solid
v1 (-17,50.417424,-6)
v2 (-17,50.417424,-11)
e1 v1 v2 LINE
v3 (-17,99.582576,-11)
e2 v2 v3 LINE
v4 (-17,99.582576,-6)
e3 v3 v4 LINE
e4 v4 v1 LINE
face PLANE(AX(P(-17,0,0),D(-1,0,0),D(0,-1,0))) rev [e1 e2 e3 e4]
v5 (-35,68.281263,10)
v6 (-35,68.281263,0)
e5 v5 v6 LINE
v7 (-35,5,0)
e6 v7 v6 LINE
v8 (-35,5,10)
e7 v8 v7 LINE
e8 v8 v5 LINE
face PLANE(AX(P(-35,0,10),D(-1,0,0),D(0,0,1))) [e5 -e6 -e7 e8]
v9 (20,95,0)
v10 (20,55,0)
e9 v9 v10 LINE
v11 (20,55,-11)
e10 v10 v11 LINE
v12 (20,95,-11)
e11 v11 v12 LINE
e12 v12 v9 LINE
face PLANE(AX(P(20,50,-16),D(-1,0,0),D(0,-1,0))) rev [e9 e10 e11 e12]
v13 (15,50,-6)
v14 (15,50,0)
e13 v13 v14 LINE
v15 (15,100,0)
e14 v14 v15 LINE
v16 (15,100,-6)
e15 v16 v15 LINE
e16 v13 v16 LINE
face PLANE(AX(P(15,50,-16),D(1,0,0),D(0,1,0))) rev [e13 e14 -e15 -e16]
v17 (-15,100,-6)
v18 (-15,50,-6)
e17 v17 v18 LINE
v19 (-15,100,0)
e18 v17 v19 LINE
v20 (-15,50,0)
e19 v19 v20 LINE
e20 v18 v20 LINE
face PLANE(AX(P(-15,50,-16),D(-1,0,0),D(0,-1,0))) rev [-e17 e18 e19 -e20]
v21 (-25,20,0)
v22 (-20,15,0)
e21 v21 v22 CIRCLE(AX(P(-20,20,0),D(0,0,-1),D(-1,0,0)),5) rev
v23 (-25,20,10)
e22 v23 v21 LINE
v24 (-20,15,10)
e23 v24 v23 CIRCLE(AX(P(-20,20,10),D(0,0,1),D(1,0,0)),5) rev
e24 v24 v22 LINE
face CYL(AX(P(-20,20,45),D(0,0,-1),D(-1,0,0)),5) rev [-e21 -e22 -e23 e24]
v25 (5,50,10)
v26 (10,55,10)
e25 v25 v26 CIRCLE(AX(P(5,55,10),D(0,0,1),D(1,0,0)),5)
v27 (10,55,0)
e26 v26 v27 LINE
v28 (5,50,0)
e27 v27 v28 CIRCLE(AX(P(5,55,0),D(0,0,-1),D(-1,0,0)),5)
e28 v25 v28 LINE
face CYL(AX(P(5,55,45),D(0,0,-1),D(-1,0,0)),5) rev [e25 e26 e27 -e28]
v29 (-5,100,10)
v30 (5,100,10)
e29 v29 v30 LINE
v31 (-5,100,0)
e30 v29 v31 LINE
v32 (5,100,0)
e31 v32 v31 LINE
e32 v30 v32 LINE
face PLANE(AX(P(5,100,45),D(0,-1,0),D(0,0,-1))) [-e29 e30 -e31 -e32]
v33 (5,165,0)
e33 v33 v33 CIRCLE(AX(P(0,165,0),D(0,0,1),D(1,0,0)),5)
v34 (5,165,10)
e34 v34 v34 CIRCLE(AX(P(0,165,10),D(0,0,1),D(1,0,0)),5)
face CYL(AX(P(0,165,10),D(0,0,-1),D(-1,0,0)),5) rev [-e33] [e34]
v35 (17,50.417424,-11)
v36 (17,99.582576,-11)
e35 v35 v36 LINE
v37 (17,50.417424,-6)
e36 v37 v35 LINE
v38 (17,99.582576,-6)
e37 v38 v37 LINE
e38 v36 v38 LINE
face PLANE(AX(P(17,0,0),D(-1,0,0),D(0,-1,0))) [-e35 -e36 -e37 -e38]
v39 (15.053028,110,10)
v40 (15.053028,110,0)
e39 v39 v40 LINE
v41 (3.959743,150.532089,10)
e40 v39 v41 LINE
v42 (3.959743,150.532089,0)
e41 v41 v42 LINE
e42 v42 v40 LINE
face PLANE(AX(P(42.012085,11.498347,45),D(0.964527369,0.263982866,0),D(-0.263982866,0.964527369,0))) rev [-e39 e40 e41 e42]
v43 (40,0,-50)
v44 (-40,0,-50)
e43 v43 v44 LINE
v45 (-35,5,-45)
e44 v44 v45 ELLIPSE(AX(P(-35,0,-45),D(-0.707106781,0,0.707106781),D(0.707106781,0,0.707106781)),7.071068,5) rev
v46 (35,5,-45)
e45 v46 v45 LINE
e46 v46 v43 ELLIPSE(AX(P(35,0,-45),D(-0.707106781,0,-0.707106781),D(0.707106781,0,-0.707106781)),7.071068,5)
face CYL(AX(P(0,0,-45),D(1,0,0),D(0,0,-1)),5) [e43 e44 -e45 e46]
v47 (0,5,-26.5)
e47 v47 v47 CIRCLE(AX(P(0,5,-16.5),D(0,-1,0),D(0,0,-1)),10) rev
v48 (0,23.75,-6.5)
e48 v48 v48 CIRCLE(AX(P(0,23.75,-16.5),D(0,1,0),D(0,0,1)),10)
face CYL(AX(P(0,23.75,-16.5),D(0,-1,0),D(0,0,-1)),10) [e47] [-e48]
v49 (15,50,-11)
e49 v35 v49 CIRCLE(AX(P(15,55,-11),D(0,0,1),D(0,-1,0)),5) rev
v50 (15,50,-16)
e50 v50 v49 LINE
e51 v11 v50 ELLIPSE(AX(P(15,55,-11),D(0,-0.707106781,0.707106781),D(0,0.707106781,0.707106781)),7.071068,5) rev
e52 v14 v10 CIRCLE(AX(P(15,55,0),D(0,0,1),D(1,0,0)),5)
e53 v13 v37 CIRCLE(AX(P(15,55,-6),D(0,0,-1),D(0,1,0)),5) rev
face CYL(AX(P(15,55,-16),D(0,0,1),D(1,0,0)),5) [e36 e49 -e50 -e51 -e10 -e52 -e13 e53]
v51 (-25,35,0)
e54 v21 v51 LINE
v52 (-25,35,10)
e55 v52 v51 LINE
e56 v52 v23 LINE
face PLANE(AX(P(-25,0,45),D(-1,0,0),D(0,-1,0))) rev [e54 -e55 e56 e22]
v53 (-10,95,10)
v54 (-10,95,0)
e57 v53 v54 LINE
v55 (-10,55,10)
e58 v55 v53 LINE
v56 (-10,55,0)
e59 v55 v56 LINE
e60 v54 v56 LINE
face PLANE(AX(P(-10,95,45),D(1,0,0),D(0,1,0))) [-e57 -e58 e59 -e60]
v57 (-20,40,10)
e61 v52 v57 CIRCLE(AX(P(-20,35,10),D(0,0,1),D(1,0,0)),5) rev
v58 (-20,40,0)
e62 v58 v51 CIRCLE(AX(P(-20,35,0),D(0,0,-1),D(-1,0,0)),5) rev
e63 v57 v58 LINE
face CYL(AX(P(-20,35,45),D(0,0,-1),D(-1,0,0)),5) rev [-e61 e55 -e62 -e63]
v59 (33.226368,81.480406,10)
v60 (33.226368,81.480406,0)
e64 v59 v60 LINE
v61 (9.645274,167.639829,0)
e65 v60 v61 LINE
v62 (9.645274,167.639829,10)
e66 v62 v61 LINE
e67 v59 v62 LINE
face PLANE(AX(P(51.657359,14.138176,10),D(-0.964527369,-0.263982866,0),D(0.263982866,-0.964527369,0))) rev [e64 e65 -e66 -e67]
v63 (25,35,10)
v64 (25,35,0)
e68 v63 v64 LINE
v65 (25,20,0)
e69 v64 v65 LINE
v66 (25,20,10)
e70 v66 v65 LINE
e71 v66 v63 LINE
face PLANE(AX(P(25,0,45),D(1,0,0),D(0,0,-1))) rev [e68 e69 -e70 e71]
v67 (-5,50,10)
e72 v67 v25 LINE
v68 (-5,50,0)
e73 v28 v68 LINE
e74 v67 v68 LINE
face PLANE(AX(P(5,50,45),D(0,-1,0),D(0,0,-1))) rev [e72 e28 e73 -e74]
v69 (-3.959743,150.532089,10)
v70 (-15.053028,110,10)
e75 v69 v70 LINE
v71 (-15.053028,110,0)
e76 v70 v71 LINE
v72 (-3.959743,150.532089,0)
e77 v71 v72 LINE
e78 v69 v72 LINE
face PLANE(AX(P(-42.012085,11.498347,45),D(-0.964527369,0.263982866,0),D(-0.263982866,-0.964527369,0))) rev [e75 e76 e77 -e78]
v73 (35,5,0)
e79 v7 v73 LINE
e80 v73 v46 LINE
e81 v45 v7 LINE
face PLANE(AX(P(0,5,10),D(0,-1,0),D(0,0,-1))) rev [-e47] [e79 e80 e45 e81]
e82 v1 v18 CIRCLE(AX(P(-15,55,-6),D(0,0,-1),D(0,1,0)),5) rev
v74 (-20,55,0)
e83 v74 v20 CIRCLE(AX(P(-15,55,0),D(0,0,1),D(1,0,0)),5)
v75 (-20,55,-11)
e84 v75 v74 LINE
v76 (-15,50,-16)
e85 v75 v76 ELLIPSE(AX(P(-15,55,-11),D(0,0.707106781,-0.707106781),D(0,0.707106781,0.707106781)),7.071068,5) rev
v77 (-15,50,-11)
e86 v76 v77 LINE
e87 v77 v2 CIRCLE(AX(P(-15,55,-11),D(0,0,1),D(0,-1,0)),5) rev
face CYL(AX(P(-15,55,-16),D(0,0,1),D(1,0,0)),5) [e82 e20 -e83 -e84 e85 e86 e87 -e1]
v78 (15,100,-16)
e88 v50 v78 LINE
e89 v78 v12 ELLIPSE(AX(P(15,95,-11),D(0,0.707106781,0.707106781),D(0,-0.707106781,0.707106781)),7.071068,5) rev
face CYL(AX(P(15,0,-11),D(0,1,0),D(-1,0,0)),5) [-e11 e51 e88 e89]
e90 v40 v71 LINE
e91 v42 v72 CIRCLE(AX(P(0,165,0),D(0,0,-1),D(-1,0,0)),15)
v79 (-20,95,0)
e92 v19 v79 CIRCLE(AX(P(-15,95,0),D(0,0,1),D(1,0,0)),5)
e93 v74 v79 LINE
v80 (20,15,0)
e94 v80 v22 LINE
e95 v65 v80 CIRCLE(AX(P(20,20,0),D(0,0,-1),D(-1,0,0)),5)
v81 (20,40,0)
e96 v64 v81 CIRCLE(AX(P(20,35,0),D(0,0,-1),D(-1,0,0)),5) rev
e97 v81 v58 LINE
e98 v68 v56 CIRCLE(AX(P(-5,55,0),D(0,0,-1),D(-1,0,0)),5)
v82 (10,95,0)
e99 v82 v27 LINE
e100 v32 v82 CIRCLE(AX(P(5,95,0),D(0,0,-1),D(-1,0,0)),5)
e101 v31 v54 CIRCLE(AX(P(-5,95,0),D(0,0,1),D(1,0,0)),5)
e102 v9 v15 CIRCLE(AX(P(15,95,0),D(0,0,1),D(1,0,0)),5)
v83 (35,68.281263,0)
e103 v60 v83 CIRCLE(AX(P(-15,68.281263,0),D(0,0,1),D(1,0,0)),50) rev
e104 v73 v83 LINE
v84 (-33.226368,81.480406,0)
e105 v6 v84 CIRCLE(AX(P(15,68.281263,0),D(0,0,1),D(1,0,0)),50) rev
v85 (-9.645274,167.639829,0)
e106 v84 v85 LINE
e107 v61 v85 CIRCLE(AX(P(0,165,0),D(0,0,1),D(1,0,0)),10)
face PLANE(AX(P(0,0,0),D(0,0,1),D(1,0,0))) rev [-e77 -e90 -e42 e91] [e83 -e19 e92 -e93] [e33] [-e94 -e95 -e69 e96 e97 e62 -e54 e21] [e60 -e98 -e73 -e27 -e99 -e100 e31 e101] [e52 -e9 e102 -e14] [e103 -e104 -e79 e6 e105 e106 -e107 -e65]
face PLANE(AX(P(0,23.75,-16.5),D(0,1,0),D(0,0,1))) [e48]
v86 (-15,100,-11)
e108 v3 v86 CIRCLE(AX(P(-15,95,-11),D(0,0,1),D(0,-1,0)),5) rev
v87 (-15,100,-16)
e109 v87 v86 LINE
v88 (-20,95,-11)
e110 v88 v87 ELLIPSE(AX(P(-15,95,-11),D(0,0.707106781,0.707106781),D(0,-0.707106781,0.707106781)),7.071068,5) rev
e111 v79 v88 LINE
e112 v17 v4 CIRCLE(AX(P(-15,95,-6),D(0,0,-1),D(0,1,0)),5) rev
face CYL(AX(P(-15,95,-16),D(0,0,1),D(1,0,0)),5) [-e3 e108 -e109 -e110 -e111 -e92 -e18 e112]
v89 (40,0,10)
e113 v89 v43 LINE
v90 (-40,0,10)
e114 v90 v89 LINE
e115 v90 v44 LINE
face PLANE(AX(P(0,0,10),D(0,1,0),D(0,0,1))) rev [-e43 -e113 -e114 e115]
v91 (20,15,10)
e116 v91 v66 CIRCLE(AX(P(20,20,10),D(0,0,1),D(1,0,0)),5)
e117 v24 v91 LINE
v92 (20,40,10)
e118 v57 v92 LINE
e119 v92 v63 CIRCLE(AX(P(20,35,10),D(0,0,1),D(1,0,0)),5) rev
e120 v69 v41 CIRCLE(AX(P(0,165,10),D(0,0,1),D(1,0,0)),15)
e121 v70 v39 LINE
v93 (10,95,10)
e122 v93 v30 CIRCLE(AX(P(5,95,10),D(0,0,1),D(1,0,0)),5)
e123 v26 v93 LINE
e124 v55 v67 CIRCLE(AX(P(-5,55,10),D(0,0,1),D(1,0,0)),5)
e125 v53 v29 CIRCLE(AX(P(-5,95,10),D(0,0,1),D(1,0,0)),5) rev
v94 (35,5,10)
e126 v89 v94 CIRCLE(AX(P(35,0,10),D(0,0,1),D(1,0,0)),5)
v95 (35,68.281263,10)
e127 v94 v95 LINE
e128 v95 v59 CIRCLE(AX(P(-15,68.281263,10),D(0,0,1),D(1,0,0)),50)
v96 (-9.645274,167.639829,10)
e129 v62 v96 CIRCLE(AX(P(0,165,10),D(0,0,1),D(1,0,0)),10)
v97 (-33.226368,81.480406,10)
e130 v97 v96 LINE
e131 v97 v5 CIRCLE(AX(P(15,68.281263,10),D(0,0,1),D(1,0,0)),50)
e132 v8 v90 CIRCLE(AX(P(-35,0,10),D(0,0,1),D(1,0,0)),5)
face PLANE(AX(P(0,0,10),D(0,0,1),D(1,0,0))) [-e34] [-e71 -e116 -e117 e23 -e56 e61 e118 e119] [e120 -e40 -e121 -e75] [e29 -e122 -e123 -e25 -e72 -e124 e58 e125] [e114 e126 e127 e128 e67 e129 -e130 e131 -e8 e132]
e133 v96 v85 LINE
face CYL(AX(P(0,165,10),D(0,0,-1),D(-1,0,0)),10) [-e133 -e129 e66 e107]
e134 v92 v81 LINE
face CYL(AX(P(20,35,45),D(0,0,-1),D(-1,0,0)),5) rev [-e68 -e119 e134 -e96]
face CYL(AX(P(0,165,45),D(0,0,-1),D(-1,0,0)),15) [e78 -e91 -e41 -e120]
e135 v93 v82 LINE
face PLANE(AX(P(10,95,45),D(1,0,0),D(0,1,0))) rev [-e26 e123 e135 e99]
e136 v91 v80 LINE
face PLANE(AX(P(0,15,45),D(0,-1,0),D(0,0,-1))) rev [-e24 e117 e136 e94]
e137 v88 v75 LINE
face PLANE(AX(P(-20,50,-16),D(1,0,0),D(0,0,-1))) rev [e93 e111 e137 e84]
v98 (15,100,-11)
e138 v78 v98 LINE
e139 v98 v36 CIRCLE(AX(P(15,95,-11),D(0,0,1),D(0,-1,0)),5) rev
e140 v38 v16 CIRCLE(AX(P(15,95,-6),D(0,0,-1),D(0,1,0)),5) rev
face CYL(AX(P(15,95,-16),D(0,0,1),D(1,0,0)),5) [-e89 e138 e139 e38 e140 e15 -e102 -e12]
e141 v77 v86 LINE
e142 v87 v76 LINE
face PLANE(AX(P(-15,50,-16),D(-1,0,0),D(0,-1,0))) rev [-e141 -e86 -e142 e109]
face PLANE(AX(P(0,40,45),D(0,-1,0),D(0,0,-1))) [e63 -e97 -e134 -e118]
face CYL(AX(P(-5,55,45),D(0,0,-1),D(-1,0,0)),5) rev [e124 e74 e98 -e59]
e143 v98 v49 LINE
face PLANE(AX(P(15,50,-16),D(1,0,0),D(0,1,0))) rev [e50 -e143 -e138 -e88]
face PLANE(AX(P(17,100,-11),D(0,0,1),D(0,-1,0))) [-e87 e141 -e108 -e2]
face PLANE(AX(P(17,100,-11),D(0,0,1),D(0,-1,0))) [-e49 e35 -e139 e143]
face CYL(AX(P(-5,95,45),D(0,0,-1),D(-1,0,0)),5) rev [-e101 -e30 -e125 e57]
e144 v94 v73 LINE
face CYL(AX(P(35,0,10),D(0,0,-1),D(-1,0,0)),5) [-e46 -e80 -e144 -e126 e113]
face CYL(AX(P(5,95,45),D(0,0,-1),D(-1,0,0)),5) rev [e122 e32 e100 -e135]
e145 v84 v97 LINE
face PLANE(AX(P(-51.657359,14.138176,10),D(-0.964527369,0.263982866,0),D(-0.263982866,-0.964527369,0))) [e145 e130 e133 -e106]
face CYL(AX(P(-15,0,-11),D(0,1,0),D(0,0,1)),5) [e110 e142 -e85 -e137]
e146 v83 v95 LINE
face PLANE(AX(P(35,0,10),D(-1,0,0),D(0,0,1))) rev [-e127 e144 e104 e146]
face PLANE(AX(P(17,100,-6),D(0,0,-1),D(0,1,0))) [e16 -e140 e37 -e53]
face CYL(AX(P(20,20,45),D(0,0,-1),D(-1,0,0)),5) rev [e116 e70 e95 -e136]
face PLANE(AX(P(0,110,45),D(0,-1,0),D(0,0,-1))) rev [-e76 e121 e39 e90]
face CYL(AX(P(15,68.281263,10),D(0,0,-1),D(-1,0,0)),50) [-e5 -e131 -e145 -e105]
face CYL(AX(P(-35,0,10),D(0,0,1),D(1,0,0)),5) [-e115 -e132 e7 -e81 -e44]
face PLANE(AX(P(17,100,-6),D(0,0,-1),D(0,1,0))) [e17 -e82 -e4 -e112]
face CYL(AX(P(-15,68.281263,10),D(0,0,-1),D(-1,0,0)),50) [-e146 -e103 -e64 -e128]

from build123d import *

# Parameters (mm, degrees)
SKETCH1_R               = 5
BOSS_EXTRUDE1_DEPTH     = 10
SKETCH2_W               = 80
SKETCH2_H               = 5
BOSS_EXTRUDE2_DEPTH     = 50
SKETCH3_W               = 5
SKETCH3_H               = 50
BOSS_EXTRUDE3_DEPTH     = 16
FILLET1_R               = 50
FILLET3_R               = 5
FILLET7_R               = 5
FILLET8_R               = 5
CUT_EXTRUDE4_DEPTH      = 32
CUT_EXTRUDE4_DEPTH_BACK = 2
SKETCH8_W               = 5
SKETCH8_H               = 50
SKETCH11_R              = 10
BOSS_EXTRUDE5_DEPTH     = 18.75
CUT_EXTRUDE9_DEPTH      = 45


with BuildPart() as part:
    # Sketch1 → Boss-Extrude1 (new body)
    with BuildSketch(Plane.XY):
        with BuildLine():
            Line((-40, 5), (-40, 0))
            Line((-40, 0), (40, 0))
            Line((40, 0), (40, 5))
            Line((40, 5), (35, 5))
            Line((35, 5), (35, 75))
            Line((35, 75), (9.645273695, 167.639828659))
            ThreePointArc((9.645273695, 167.639828659), (0, 175), (-9.645273695, 167.639828659))
            Line((-9.645273695, 167.639828659), (-35, 75))
            Line((-35, 75), (-35, 5))
            Line((-35, 5), (-40, 5))
        make_face()
        with Locations((0, 165)):
            Circle(SKETCH1_R, mode=Mode.SUBTRACT)
    extrude(amount=BOSS_EXTRUDE1_DEPTH)

    # Sketch2 → Boss-Extrude2 (add)
    with BuildSketch(Plane(origin=(0, 0, 0), x_dir=(-1, 0, 0), z_dir=(0, 0, -1))):
        with Locations((0, 2.5)):
            Rectangle(SKETCH2_W, SKETCH2_H)
    extrude(amount=BOSS_EXTRUDE2_DEPTH)

    # Sketch3 → Boss-Extrude3 (add)
    with BuildSketch(Plane(origin=(0, 0, 0), x_dir=(-1, 0, 0), z_dir=(0, 0, -1))):
        with Locations((-17.5, 75)):
            Rectangle(SKETCH3_W, SKETCH3_H)
        with Locations((17.5, 75)):
            Rectangle(SKETCH3_W, SKETCH3_H)
    extrude(amount=BOSS_EXTRUDE3_DEPTH)

    # Fillet1
    fillet1_edges = [part.edges().sort_by_distance(p)[0] for p in [
        (-35, 75, 5),
        (35, 75, 5),
    ]]
    fillet(fillet1_edges, radius=FILLET1_R)

    # Fillet3
    fillet3_edges = [part.edges().sort_by_distance(p)[0] for p in [
        (0, 5, -50),
        (-40, 5, -20),
        (40, 5, -20),
    ]]
    fillet(fillet3_edges, radius=FILLET3_R - 0.0001)  # a hair under: the kernel refuses the full size

    # Fillet7
    fillet7_edges = [part.edges().sort_by_distance(p)[0] for p in [
        (20, 75, -16),
        (20, 50, -8),
        (20, 100, -8),
    ]]
    fillet(fillet7_edges, radius=FILLET7_R - 0.0001)  # a hair under: the kernel refuses the full size

    # Fillet8
    fillet8_edges = [part.edges().sort_by_distance(p)[0] for p in [
        (-20, 50, -8),
        (-20, 75, -16),
        (-20, 100, -8),
    ]]
    fillet(fillet8_edges, radius=FILLET8_R - 0.0001)  # a hair under: the kernel refuses the full size

    # Sketch8 → Cut-Extrude4 (cut, two sides: drawn at the far end of the back side and taken through both)
    with BuildSketch(Plane(origin=(-15, 0, 0), x_dir=(0, 0, -1), z_dir=(1, 0, 0)).offset(-CUT_EXTRUDE4_DEPTH_BACK)):
        with Locations((8.5, 75)):
            Rectangle(SKETCH8_W, SKETCH8_H)
    extrude(amount=CUT_EXTRUDE4_DEPTH + CUT_EXTRUDE4_DEPTH_BACK, mode=Mode.SUBTRACT)

    # Sketch11 → Boss-Extrude5 (add)
    with BuildSketch(Plane(origin=(0, 5, 0), x_dir=(1, 0, 0), z_dir=(0, 1, 0))):
        with Locations(Location((0, 16.5, 0), (0, 0, 90))):
            Circle(SKETCH11_R)
    extrude(amount=BOSS_EXTRUDE5_DEPTH)

    # Sketch14 → Cut-Extrude9 (cut)
    with BuildSketch(Plane(origin=(0, 0, 0), x_dir=(-1, 0, 0), z_dir=(0, 0, -1))):
        with BuildLine():
            Line((-25, 35), (-25, 20))
            ThreePointArc((-25, 20), (-23.535533906, 16.464466094), (-20, 15))
            Line((-20, 15), (20, 15))
            ThreePointArc((20, 15), (23.535533906, 16.464466094), (25, 20))
            Line((25, 20), (25, 35))
            ThreePointArc((25, 35), (23.535533906, 38.535533906), (20, 40))
            Line((20, 40), (-20, 40))
            ThreePointArc((-20, 40), (-23.535533906, 38.535533906), (-25, 35))
        make_face()
        with BuildLine():
            ThreePointArc((-3.959742989, 150.532089458), (0, 150), (3.959742989, 150.532089458))
            Line((3.959742989, 150.532089458), (15.05302813, 110))
            Line((15.05302813, 110), (-15.05302813, 110))
            Line((-15.05302813, 110), (-3.959742989, 150.532089458))
        make_face()
        with BuildLine():
            Line((-10, 95), (-10, 55))
            ThreePointArc((-10, 55), (-8.535533906, 51.464466094), (-5, 50))
            Line((-5, 50), (5, 50))
            ThreePointArc((5, 50), (8.535533906, 51.464466094), (10, 55))
            Line((10, 55), (10, 95))
            ThreePointArc((10, 95), (8.535533906, 98.535533906), (5, 100))
            Line((5, 100), (-5, 100))
            ThreePointArc((-5, 100), (-8.535533906, 98.535533906), (-10, 95))
        make_face()
    extrude(amount=-CUT_EXTRUDE9_DEPTH, mode=Mode.SUBTRACT)


solid = part.part
